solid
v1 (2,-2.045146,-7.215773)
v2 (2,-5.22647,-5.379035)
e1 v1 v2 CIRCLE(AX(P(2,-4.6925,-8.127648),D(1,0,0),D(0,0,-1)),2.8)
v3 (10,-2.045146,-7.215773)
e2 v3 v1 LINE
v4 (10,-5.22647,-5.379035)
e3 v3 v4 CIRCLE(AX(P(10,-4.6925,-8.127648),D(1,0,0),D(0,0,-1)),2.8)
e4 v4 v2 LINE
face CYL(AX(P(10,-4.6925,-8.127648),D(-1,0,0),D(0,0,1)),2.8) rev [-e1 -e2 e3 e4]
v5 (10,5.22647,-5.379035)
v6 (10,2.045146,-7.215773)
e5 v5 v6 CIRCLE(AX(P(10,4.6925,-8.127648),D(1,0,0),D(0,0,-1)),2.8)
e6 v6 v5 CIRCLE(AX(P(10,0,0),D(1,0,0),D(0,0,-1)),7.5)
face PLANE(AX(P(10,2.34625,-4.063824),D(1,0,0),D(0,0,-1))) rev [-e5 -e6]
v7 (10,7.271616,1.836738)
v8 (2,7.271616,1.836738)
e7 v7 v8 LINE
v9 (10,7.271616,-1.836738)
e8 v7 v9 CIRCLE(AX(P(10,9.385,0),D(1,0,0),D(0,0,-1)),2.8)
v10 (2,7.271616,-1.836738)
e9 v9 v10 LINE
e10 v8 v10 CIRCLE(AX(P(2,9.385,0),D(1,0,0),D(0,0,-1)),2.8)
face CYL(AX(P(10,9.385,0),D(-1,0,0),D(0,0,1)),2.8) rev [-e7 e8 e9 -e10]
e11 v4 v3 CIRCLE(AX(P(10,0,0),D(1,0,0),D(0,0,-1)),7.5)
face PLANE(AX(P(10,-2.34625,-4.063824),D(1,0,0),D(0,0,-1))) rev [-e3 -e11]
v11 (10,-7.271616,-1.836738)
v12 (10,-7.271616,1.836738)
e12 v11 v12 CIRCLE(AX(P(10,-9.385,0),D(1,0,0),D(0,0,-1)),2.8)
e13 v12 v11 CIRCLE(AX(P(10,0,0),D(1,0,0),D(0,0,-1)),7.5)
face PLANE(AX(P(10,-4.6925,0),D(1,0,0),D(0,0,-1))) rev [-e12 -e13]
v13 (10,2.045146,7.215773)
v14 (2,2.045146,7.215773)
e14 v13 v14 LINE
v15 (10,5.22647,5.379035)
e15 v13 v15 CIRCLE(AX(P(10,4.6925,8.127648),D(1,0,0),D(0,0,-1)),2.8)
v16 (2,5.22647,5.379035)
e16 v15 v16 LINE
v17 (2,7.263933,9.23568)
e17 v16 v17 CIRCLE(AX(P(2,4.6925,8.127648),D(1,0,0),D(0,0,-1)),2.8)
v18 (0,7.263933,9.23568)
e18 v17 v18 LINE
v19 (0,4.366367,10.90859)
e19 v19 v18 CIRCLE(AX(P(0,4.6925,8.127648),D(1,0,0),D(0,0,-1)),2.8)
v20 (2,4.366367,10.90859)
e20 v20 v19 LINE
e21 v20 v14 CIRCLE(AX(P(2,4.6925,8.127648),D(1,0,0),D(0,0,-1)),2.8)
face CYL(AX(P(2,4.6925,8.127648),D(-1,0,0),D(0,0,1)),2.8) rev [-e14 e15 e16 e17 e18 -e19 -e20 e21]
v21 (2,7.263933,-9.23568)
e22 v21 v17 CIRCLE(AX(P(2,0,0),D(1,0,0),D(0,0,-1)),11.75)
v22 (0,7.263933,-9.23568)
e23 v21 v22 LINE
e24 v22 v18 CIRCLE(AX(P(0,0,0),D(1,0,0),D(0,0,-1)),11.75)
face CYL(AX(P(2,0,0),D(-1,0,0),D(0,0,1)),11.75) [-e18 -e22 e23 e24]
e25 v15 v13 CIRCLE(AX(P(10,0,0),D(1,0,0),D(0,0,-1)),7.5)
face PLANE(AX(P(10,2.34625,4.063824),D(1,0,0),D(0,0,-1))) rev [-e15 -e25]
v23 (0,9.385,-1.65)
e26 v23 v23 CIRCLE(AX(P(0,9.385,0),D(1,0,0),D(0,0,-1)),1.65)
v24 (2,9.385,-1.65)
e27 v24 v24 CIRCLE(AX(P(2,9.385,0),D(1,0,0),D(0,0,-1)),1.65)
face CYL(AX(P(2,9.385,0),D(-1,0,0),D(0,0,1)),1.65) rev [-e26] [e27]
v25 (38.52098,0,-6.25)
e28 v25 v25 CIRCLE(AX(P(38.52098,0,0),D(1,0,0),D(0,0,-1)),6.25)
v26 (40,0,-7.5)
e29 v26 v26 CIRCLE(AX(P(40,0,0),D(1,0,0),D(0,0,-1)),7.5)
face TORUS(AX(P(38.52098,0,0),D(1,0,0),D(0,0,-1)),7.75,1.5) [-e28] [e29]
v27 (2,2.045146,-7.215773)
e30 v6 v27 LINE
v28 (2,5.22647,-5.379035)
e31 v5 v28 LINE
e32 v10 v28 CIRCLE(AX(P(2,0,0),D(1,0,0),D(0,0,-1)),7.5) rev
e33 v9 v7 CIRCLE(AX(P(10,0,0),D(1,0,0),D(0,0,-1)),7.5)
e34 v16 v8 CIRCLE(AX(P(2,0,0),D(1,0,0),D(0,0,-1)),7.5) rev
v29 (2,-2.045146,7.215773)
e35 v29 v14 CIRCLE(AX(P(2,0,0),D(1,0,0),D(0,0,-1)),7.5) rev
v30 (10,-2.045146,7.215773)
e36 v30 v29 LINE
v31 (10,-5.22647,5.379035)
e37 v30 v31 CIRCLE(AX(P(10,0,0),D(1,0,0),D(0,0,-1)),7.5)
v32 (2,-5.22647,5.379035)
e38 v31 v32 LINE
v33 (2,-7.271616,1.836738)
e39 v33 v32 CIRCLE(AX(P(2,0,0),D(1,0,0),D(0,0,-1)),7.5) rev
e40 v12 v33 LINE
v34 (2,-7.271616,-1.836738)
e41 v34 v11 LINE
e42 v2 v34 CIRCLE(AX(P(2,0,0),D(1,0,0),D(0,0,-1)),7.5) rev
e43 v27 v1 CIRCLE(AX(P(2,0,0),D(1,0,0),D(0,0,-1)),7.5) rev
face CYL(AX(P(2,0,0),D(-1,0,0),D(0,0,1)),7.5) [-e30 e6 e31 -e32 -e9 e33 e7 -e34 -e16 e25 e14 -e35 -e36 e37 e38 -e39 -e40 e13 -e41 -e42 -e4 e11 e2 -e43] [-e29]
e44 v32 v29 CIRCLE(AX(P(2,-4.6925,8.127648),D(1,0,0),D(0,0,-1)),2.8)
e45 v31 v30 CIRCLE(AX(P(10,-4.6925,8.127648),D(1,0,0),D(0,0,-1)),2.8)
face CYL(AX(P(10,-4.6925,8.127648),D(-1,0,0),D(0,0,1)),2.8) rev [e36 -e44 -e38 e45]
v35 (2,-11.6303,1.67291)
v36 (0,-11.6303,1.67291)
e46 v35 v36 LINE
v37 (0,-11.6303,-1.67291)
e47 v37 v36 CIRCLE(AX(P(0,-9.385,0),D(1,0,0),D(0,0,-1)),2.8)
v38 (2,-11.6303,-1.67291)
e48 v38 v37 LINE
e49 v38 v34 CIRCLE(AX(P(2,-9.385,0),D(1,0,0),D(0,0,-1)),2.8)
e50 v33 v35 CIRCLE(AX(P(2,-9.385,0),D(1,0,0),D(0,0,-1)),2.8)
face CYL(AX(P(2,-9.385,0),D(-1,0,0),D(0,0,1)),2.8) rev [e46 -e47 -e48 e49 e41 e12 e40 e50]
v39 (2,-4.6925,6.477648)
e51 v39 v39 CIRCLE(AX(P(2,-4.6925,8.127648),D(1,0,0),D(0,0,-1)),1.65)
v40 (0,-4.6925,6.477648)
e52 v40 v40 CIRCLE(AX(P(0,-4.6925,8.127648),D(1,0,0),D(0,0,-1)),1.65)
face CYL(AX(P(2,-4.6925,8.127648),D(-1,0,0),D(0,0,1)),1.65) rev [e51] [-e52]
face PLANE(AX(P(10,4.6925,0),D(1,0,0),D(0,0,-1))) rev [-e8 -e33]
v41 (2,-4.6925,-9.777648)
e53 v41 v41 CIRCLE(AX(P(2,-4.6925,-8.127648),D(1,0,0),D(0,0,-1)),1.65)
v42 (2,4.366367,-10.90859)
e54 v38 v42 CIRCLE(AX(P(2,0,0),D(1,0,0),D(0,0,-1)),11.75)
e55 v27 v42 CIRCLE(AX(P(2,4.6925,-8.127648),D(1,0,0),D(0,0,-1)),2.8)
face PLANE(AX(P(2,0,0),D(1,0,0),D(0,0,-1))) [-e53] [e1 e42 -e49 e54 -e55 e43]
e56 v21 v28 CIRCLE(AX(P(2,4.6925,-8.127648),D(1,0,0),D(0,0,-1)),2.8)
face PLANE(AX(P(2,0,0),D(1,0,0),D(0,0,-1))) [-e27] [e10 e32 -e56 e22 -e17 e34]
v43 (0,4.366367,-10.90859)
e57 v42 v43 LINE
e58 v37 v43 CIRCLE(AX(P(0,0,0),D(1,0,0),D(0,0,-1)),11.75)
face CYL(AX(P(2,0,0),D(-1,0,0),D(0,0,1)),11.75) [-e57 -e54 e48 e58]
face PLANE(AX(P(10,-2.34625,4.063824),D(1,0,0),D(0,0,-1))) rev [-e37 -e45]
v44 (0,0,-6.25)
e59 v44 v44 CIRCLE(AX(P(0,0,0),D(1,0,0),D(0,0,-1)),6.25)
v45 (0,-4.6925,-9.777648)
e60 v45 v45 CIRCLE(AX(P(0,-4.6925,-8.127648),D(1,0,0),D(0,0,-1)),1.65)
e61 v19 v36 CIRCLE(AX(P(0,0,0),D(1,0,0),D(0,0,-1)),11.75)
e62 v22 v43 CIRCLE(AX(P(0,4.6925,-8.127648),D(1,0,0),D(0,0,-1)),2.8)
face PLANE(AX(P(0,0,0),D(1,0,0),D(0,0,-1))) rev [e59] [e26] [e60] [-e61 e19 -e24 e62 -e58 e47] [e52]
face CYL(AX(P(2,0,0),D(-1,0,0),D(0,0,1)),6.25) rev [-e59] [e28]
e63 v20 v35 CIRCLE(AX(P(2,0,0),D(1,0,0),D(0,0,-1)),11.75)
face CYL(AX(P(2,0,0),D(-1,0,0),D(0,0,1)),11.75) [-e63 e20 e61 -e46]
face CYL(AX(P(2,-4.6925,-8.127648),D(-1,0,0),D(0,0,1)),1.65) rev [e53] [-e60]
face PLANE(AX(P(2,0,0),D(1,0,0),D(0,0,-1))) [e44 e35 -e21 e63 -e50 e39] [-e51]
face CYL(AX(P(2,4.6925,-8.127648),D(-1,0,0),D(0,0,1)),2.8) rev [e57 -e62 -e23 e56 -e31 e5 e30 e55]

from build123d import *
from build123d.topology import SkipClean

# Parameters (mm, degrees)
SKETCH1_R                 = 1.6500000000000006
SKETCH1_R_2               = 6.25
SKETCH1_R_3               = 1.6500000000000004
BOSS_EXTRUDE1_DEPTH       = 2
BOSS_EXTRUDE2_START       = 2
BOSS_EXTRUDE2_OUTLINE_R   = 7.5
BOSS_EXTRUDE2_OUTLINE_R_2 = 6.25
BOSS_EXTRUDE2_DEPTH       = 38
CUT_EXTRUDE2_START        = 2
SKETCH1_4_R               = 2.8
SKETCH1_4_R_2             = 2.8000000000000003
SKETCH1_4_R_3             = 2.7999999999999994
SKETCH1_4_R_4             = 2.8000000000000016
CUT_EXTRUDE2_DEPTH        = 8
CUT_EXTRUDE3_START        = 2
SKETCH1_5_R               = 2.8
SKETCH1_5_R_2             = 2.7999999999999994
SKETCH1_5_R_3             = 2.8000000000000016
CUT_EXTRUDE3_DEPTH        = 46.314258622305886
FILLET1_R                 = 1.5


# Read off the part's stored shape, not the designer's step: Boss-Extrude2
with BuildPart() as part:
    # Sketch1 → Boss-Extrude1 (new body)
    with BuildSketch(Plane(origin=(0, 0, 0), x_dir=(0, 0, -1), z_dir=(1, 0, 0))):
        with BuildLine():
            ThreePointArc((-9.235679756024062, 7.263932780812693), (-6.819714318196267, 7.1682440093196265), (-5.379034853060263, 5.226469558848167))
            ThreePointArc((-5.37903485305997, 5.226469558848125), (-6.495190528383201, 3.7500000000001563), (-7.215772836598412, 2.0451460511681123))
            ThreePointArc((-7.215772836598439, 2.0451460511681465), (-9.617738571694561, 2.3219238414507375), (-10.908590197578363, 4.366366899528586))
            ThreePointArc((-10.908590197578294, 4.366366899528582), (-10.175798494467182, -5.8749999999999565), (-1.672910441554004, -11.630299680340986))
            ThreePointArc((-1.6729104415540204, -11.630299680341029), (-2.7980242534982347, -9.490167850770279), (-1.836737983538199, -7.271615610016004))
            ThreePointArc((-1.8367379835382087, -7.271615610015976), (-1.38e-15, -7.500000000000001), (1.8367379835382058, -7.271615610015976))
            ThreePointArc((1.8367379835381987, -7.271615610016002), (2.798024253498237, -9.49016785077028), (1.6729104415540168, -11.630299680341032))
            ThreePointArc((1.672910441553996, -11.630299680340986), (10.175798494467136, -5.8750000000000355), (10.908590197578357, 4.366366899528418))
            ThreePointArc((10.908590197578427, 4.3663668995284235), (9.617738571694534, 2.3219238414505634), (7.215772836598344, 2.0451460511680883))
            ThreePointArc((7.2157728365984, 2.0451460511681567), (6.495190528383213, 3.7500000000001346), (5.379034853060037, 5.226469558848057))
            ThreePointArc((5.379034853060338, 5.226469558848102), (6.81971431819637, 7.168244009319535), (9.235679756024162, 7.263932780812571))
            ThreePointArc((9.235679756024219, 7.263932780812644), (7.994e-14, 11.750000000000004), (-9.235679756024119, 7.26393278081277))
        make_face()
        with Locations((-8.127648414516955, -4.692500000000004)):
            Circle(SKETCH1_R, mode=Mode.SUBTRACT)
        Circle(SKETCH1_R_2, mode=Mode.SUBTRACT)
        with Locations((8.127648414516958, -4.692499999999999)):
            Circle(SKETCH1_R, mode=Mode.SUBTRACT)
        with Locations((-1.7e-16, 9.385)):
            Circle(SKETCH1_R_3, mode=Mode.SUBTRACT)
    extrude(amount=BOSS_EXTRUDE1_DEPTH)

    # Boss-Extrude2 outline → Boss-Extrude2 (add)
    with BuildSketch(Plane(origin=(0, 0, 0), x_dir=(0, 0, -1), z_dir=(1, 0, 0)).offset(BOSS_EXTRUDE2_START)):
        Circle(BOSS_EXTRUDE2_OUTLINE_R)
        Circle(BOSS_EXTRUDE2_OUTLINE_R_2, mode=Mode.SUBTRACT)
    extrude(amount=BOSS_EXTRUDE2_DEPTH)

    # Sketch1<4> → Cut-Extrude2 (cut)
    with BuildSketch(Plane(origin=(0, 0, 0), x_dir=(0, 0, -1), z_dir=(1, 0, 0)).offset(CUT_EXTRUDE2_START)):
        with Locations((1.15e-15, -9.385)):
            Circle(SKETCH1_4_R)
        with Locations((-8.127648414517033, -4.692499999999865)):
            Circle(SKETCH1_4_R_2)
        with Locations((-8.127648414516935, 4.692500000000037)):
            Circle(SKETCH1_4_R_3)
        with Locations((6.439e-14, 9.385)):
            Circle(SKETCH1_4_R)
        with Locations((8.127648414517003, 4.692499999999925)):
            Circle(SKETCH1_4_R_4)
        with Locations((8.127648414516901, -4.692500000000093)):
            Circle(SKETCH1_4_R_3)
    extrude(amount=CUT_EXTRUDE2_DEPTH, mode=Mode.SUBTRACT)

    # Sketch1<5> → Cut-Extrude3 (cut, through all)
    with SkipClean():  # the faces are left unmerged after this step: merging them gives an invalid solid
        with BuildSketch(Plane(origin=(0, 0, 0), x_dir=(0, 0, -1), z_dir=(1, 0, 0)).offset(CUT_EXTRUDE3_START)):
            with Locations((1.15e-15, -9.385)):
                Circle(SKETCH1_5_R)
            with Locations((-8.127648414516935, 4.692500000000037)):
                Circle(SKETCH1_5_R_2)
            with Locations((8.127648414517003, 4.692499999999925)):
                Circle(SKETCH1_5_R_3)
        extrude(amount=-CUT_EXTRUDE3_DEPTH, mode=Mode.SUBTRACT)

    # Fillet1
    # the kernel refuses this fillet: 1.5 mm, written as the material it takes off along each edge
    with BuildSketch(Plane(origin=(40, 0, 0), x_dir=(0, 0, -1), z_dir=(0, -1, 0))) as fillet1_piece_1:
        with BuildLine():
            CenterArc((7.75, -1.4790199457750504), FILLET1_R, 99.59406822685953, 80.40593177314048)
            Line((7.500000000000024, -1.4211e-13), (7.495000000000024, 0.02958039891535691))
            ThreePointArc((7.495000000000024, 0.02958039891535691), (6.875000000000012, 0.03000000000000114), (6.25, 0.03000000000000114))
            Line((6.25, 0.03000000000000114), (6.22, 0))
            Line((6.22, 0), (6.22, -1.4790199457750504))
            Line((6.22, -1.4790199457750504), (6.25, -1.4790199457750504))
        make_face()
    revolve(axis=Axis((40, 0, 0), (1, 0, 0)), mode=Mode.SUBTRACT)


solid = part.part
